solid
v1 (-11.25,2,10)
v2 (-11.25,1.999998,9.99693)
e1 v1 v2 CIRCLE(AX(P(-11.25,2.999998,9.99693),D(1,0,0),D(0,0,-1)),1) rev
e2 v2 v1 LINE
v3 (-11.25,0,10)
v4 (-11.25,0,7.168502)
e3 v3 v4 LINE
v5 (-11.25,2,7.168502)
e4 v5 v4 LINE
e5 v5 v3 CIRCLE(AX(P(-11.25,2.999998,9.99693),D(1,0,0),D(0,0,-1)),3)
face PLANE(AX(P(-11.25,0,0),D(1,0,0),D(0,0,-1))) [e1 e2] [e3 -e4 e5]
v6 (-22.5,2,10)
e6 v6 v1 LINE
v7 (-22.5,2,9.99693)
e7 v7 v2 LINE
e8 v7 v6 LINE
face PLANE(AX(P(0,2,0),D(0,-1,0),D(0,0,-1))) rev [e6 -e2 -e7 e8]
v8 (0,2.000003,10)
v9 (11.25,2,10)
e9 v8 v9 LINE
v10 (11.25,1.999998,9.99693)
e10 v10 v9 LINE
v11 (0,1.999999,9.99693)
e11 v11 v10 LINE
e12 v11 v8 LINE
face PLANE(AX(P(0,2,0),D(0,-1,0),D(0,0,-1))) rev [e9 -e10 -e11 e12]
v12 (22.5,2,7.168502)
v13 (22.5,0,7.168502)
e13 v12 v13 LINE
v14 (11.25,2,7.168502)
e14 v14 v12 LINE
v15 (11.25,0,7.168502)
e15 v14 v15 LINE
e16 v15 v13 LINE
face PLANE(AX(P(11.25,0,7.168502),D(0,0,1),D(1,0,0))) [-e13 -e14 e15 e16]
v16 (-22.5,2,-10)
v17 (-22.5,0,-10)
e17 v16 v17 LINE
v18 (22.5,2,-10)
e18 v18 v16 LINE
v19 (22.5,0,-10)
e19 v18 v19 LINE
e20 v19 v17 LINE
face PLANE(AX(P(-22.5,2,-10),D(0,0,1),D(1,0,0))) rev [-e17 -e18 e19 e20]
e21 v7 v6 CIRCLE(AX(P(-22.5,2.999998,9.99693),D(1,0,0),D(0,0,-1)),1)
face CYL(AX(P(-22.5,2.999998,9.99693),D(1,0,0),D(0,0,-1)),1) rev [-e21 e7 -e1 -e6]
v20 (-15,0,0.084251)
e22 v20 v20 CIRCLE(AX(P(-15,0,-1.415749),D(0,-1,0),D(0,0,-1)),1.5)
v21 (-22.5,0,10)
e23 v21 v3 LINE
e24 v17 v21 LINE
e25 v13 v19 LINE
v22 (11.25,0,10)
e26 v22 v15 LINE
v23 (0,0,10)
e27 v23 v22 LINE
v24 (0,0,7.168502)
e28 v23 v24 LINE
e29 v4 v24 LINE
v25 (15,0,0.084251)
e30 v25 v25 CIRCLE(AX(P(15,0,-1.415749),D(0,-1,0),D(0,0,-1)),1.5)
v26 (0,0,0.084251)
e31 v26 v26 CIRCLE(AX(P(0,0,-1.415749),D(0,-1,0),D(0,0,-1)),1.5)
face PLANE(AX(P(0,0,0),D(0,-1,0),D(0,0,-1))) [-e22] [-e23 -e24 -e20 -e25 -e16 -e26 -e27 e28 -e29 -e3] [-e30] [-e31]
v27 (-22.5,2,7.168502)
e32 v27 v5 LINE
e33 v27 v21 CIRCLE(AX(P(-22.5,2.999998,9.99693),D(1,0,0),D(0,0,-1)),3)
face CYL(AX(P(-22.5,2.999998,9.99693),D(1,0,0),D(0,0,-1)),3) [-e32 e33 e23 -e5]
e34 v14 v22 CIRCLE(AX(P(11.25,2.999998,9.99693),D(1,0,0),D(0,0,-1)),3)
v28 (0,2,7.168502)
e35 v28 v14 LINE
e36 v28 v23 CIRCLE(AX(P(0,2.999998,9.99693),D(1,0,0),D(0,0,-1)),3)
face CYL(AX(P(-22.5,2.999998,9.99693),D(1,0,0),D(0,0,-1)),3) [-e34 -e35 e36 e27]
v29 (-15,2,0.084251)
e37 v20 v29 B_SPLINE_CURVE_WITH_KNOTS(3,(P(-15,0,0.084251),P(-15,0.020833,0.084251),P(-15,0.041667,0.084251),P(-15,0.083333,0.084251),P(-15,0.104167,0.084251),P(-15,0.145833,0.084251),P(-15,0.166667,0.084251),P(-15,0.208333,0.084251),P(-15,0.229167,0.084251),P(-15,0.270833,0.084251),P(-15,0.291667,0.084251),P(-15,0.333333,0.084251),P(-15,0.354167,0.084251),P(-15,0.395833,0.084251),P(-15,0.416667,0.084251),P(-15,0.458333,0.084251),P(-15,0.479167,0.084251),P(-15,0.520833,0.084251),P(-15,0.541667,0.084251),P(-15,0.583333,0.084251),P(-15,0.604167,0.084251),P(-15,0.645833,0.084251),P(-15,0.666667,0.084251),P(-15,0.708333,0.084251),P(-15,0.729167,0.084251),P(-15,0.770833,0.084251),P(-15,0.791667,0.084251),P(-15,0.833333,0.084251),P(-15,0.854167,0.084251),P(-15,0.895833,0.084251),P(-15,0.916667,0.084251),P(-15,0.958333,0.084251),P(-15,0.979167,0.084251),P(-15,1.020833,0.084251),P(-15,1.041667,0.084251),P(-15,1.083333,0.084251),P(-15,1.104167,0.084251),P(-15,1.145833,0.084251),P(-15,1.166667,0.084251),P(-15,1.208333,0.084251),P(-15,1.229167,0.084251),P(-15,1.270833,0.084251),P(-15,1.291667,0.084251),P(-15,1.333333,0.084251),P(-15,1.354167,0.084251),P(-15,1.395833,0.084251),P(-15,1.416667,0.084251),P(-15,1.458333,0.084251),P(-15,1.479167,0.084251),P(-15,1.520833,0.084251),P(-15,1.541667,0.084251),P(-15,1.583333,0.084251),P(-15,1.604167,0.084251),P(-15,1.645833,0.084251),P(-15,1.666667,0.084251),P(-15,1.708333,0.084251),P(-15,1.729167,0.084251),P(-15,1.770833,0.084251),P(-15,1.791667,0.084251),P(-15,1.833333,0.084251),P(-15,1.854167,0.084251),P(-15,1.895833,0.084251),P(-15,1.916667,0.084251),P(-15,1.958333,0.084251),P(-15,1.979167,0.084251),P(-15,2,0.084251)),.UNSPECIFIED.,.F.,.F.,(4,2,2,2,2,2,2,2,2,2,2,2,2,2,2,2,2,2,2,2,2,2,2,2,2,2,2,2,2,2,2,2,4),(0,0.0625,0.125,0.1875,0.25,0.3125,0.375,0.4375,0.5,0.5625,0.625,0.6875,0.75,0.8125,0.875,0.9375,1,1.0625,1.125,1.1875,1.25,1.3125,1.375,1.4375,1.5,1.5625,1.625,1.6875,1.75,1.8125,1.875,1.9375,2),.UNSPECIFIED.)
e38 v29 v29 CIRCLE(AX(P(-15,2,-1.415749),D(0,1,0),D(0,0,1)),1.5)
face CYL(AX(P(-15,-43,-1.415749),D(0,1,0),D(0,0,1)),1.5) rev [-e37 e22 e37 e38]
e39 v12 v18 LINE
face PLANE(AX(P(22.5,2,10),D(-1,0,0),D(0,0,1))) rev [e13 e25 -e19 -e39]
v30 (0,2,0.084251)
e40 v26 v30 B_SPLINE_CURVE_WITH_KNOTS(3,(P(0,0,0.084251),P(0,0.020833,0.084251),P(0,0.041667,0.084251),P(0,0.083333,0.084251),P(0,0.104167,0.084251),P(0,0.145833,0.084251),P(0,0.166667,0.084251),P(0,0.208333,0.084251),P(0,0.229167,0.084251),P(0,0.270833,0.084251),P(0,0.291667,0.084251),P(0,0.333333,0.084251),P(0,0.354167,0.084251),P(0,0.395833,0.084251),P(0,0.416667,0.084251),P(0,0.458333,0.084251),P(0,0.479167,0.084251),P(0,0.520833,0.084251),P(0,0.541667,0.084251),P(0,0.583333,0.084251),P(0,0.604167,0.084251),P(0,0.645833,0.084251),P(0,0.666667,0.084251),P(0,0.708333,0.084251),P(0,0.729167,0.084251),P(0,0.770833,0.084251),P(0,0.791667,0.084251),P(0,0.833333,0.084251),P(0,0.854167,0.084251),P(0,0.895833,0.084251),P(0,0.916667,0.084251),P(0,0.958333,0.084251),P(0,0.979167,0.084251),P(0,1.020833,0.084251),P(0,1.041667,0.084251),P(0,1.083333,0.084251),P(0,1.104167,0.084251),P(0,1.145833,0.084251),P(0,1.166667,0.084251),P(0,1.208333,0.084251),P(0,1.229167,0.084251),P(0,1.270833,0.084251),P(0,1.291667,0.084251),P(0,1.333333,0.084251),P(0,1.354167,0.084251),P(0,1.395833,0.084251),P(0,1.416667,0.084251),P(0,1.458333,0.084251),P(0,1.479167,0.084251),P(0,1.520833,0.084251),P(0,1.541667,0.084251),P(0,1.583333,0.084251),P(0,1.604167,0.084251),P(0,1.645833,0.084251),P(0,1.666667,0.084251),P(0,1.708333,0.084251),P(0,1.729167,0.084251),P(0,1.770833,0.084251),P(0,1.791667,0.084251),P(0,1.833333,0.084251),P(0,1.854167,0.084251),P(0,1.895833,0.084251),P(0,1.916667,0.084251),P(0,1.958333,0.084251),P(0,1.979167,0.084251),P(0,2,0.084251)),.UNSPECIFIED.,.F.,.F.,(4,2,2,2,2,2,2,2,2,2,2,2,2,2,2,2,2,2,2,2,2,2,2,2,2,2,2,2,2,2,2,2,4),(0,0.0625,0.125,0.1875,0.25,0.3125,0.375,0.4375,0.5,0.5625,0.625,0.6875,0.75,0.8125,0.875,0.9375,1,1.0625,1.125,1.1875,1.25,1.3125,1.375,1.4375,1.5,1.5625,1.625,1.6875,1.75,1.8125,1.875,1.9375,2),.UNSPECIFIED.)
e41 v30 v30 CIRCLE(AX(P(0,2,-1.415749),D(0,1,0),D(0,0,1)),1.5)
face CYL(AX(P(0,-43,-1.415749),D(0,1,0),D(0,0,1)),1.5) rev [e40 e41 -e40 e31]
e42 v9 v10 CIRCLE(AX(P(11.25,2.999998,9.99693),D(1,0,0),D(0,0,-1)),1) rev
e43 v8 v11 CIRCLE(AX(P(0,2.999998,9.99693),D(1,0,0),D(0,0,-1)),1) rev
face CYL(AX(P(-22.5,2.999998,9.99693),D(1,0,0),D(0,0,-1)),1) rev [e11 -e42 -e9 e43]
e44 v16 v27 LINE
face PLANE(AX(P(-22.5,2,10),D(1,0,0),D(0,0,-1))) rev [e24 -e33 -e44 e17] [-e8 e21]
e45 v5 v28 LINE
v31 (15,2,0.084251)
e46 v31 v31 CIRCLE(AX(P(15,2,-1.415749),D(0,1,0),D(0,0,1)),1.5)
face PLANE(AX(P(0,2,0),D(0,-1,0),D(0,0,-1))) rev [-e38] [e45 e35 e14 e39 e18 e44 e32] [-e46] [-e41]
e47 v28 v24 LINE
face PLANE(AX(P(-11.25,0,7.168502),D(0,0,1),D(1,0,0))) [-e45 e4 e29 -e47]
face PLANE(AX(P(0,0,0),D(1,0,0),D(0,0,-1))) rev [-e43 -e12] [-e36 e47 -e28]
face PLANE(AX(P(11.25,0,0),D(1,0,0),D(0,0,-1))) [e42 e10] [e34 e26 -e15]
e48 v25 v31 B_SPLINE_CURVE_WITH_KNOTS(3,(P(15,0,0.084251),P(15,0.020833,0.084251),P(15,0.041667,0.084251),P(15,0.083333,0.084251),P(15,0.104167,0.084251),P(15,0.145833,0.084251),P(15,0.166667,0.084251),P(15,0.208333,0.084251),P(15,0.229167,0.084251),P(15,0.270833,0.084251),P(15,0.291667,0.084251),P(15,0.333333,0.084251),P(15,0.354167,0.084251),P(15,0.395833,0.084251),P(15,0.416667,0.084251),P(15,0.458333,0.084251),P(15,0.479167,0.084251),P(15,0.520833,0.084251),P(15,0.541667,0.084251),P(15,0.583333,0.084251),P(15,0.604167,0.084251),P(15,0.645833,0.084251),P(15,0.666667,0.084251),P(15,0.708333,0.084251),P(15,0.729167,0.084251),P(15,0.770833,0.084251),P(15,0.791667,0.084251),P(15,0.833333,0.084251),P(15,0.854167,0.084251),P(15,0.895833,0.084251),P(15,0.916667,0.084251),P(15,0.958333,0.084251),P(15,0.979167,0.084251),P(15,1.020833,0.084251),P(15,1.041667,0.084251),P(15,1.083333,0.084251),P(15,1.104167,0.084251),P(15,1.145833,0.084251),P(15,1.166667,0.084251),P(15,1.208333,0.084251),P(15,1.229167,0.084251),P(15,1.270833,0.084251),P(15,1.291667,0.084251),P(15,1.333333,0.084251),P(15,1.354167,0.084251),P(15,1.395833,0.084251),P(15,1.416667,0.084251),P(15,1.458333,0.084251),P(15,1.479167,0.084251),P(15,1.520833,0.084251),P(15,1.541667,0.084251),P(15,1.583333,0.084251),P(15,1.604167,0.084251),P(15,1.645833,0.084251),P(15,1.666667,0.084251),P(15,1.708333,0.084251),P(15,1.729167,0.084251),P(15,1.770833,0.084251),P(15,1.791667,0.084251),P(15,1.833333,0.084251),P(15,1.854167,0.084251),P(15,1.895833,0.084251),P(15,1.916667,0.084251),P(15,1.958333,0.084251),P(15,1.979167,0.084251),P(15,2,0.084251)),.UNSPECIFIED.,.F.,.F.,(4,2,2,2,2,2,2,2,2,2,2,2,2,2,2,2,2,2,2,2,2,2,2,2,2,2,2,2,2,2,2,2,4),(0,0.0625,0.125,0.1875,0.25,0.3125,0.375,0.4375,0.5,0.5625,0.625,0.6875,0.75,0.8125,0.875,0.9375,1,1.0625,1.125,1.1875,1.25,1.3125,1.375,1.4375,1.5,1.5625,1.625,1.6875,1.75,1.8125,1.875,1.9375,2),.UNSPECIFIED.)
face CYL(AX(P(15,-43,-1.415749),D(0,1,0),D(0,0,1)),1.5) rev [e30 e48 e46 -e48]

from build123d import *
from OCP.BRepAlgoAPI import BRepAlgoAPI_Cut
from OCP.TopTools import TopTools_ListOfShape

# Parameters (mm, degrees)
IZIM1_W                     = 45
IZIM1_H                     = 20
Y_KSEKLIK_EKSTR_ZYON1_DEPTH = 2
IZIM2_R                     = 3
IZIM2_R_2                   = 1
Y_KSEKLIK_EKSTR_ZYON2_DEPTH = 45
IZIM4_R                     = 1.5
KES_EKSTR_ZYON1_DEPTH       = 45
L_O_ALTMA1_COUNT            = 3
L_O_ALTMA1_PITCH            = 15
KES_EKSTR_ZYON3_START       = -11.25
KES_EKSTR_ZYON3_DEPTH       = 11.25
L_O_ALTMA7_START            = -11.25
L_O_ALTMA7_DEPTH            = 11.25


with BuildPart() as part:
    # Çizim1 → Yükseklik-Ekstrüzyon1 (new body)
    with BuildSketch(Plane(origin=(0, 0, 0), x_dir=(1, 0, 0), z_dir=(0, 1, 0))):
        Rectangle(IZIM1_W, IZIM1_H)
    extrude(amount=Y_KSEKLIK_EKSTR_ZYON1_DEPTH)

    # Çizim2 → Yükseklik-Ekstrüzyon2 (add)
    with BuildSketch(Plane(origin=(22.5, 0, 0), x_dir=(0, 0, -1), z_dir=(1, 0, 0))):
        with Locations((-9.996930096, 2.999998429)):
            Circle(IZIM2_R)
        with Locations((-9.996930096, 2.999998429)):
            Circle(IZIM2_R_2, mode=Mode.SUBTRACT)
    extrude(amount=-Y_KSEKLIK_EKSTR_ZYON2_DEPTH)

    # Çizim4 → Kes-Ekstrüzyon1 (cut)
    with BuildSketch(Plane(origin=(0, 2, 0), x_dir=(1, 0, 0), z_dir=(0, 1, 0))):
        with Locations(Location((-15, 1.415748792, 0), (0, 0, 270))):
            Circle(IZIM4_R)
    kes_ekstr_zyon1 = extrude(amount=-KES_EKSTR_ZYON1_DEPTH, mode=Mode.SUBTRACT)

    # LÇoğaltma1: Kes-Ekstrüzyon1 ×3
    with Locations(*[(i * L_O_ALTMA1_PITCH, 0, 0) for i in range(1, L_O_ALTMA1_COUNT)]):
        add(kes_ekstr_zyon1, mode=Mode.SUBTRACT)


with BuildPart() as kes_ekstr_zyon3_tool:
    # Kes-Ekstrüzyon3: read off the stored shape, not the designer's step
    # Kes-Ekstrüzyon3 outline → Kes-Ekstrüzyon3 (new body)
    with BuildSketch(Plane(origin=(22.5, 0, 0), x_dir=(0, 0, -1), z_dir=(1, 0, 0)).offset(KES_EKSTR_ZYON3_START)):
        with BuildLine():
            Line((-7.168502416, 0), (-7.168502416, 2))
            ThreePointArc((-7.168502416, 2), (-11.727728074, 5.450373576), (-10, 0))
            Line((-10, 0), (-7.168502416, 0))
        make_face()
        with BuildLine():
            Line((-9.996930096, 1.999998429), (-9.99999999, 2.000003141))
            ThreePointArc((-9.99999999, 2.000003141), (-9.995395236, 3.999997251), (-9.996930096, 1.999998429))
        make_face(mode=Mode.SUBTRACT)
    extrude(amount=KES_EKSTR_ZYON3_DEPTH)


with BuildPart() as part_1:
    add(part.part)

    # Kes-Ekstrüzyon3: cut by kes_ekstr_zyon3_tool, with a tolerance
    kes_ekstr_zyon3_stock = TopTools_ListOfShape()
    kes_ekstr_zyon3_stock.Append(part_1.part.wrapped)
    kes_ekstr_zyon3_tools = TopTools_ListOfShape()
    kes_ekstr_zyon3_tools.Append(kes_ekstr_zyon3_tool.part.wrapped)
    kes_ekstr_zyon3_cut = BRepAlgoAPI_Cut()
    kes_ekstr_zyon3_cut.SetArguments(kes_ekstr_zyon3_stock)
    kes_ekstr_zyon3_cut.SetTools(kes_ekstr_zyon3_tools)
    kes_ekstr_zyon3_cut.SetFuzzyValue(0.00001)
    kes_ekstr_zyon3_cut.Build()
    add(Compound.cast(kes_ekstr_zyon3_cut.Shape()).solids(), mode=Mode.REPLACE)


with BuildPart() as l_o_altma7_tool:
    # LÇoğaltma7: read off the stored shape, not the designer's step
    # LÇoğaltma7 outline → LÇoğaltma7 (new body)
    with BuildSketch(Plane.YZ.offset(L_O_ALTMA7_START)):
        with BuildLine():
            Line((0, 7.168502416), (2, 7.168502416))
            ThreePointArc((2, 7.168502416), (5.450373576, 11.727728074), (0, 10))
            Line((0, 10), (0, 7.168502416))
        make_face()
        with BuildLine():
            Line((1.999998429, 9.996930096), (2.000003141, 9.99999999))
            ThreePointArc((2.000003141, 9.99999999), (3.999997251, 9.995395236), (1.999998429, 9.996930096))
        make_face(mode=Mode.SUBTRACT)
    extrude(amount=L_O_ALTMA7_DEPTH)


with BuildPart() as part_2:
    add(part_1.part)

    # LÇoğaltma7: cut by l_o_altma7_tool, with a tolerance
    l_o_altma7_stock = TopTools_ListOfShape()
    l_o_altma7_stock.Append(part_2.part.wrapped)
    l_o_altma7_tools = TopTools_ListOfShape()
    l_o_altma7_tools.Append(l_o_altma7_tool.part.wrapped)
    l_o_altma7_cut = BRepAlgoAPI_Cut()
    l_o_altma7_cut.SetArguments(l_o_altma7_stock)
    l_o_altma7_cut.SetTools(l_o_altma7_tools)
    l_o_altma7_cut.SetFuzzyValue(0.00001)
    l_o_altma7_cut.Build()
    add(Compound.cast(l_o_altma7_cut.Shape()).solids(), mode=Mode.REPLACE)


solid = part_2.part
